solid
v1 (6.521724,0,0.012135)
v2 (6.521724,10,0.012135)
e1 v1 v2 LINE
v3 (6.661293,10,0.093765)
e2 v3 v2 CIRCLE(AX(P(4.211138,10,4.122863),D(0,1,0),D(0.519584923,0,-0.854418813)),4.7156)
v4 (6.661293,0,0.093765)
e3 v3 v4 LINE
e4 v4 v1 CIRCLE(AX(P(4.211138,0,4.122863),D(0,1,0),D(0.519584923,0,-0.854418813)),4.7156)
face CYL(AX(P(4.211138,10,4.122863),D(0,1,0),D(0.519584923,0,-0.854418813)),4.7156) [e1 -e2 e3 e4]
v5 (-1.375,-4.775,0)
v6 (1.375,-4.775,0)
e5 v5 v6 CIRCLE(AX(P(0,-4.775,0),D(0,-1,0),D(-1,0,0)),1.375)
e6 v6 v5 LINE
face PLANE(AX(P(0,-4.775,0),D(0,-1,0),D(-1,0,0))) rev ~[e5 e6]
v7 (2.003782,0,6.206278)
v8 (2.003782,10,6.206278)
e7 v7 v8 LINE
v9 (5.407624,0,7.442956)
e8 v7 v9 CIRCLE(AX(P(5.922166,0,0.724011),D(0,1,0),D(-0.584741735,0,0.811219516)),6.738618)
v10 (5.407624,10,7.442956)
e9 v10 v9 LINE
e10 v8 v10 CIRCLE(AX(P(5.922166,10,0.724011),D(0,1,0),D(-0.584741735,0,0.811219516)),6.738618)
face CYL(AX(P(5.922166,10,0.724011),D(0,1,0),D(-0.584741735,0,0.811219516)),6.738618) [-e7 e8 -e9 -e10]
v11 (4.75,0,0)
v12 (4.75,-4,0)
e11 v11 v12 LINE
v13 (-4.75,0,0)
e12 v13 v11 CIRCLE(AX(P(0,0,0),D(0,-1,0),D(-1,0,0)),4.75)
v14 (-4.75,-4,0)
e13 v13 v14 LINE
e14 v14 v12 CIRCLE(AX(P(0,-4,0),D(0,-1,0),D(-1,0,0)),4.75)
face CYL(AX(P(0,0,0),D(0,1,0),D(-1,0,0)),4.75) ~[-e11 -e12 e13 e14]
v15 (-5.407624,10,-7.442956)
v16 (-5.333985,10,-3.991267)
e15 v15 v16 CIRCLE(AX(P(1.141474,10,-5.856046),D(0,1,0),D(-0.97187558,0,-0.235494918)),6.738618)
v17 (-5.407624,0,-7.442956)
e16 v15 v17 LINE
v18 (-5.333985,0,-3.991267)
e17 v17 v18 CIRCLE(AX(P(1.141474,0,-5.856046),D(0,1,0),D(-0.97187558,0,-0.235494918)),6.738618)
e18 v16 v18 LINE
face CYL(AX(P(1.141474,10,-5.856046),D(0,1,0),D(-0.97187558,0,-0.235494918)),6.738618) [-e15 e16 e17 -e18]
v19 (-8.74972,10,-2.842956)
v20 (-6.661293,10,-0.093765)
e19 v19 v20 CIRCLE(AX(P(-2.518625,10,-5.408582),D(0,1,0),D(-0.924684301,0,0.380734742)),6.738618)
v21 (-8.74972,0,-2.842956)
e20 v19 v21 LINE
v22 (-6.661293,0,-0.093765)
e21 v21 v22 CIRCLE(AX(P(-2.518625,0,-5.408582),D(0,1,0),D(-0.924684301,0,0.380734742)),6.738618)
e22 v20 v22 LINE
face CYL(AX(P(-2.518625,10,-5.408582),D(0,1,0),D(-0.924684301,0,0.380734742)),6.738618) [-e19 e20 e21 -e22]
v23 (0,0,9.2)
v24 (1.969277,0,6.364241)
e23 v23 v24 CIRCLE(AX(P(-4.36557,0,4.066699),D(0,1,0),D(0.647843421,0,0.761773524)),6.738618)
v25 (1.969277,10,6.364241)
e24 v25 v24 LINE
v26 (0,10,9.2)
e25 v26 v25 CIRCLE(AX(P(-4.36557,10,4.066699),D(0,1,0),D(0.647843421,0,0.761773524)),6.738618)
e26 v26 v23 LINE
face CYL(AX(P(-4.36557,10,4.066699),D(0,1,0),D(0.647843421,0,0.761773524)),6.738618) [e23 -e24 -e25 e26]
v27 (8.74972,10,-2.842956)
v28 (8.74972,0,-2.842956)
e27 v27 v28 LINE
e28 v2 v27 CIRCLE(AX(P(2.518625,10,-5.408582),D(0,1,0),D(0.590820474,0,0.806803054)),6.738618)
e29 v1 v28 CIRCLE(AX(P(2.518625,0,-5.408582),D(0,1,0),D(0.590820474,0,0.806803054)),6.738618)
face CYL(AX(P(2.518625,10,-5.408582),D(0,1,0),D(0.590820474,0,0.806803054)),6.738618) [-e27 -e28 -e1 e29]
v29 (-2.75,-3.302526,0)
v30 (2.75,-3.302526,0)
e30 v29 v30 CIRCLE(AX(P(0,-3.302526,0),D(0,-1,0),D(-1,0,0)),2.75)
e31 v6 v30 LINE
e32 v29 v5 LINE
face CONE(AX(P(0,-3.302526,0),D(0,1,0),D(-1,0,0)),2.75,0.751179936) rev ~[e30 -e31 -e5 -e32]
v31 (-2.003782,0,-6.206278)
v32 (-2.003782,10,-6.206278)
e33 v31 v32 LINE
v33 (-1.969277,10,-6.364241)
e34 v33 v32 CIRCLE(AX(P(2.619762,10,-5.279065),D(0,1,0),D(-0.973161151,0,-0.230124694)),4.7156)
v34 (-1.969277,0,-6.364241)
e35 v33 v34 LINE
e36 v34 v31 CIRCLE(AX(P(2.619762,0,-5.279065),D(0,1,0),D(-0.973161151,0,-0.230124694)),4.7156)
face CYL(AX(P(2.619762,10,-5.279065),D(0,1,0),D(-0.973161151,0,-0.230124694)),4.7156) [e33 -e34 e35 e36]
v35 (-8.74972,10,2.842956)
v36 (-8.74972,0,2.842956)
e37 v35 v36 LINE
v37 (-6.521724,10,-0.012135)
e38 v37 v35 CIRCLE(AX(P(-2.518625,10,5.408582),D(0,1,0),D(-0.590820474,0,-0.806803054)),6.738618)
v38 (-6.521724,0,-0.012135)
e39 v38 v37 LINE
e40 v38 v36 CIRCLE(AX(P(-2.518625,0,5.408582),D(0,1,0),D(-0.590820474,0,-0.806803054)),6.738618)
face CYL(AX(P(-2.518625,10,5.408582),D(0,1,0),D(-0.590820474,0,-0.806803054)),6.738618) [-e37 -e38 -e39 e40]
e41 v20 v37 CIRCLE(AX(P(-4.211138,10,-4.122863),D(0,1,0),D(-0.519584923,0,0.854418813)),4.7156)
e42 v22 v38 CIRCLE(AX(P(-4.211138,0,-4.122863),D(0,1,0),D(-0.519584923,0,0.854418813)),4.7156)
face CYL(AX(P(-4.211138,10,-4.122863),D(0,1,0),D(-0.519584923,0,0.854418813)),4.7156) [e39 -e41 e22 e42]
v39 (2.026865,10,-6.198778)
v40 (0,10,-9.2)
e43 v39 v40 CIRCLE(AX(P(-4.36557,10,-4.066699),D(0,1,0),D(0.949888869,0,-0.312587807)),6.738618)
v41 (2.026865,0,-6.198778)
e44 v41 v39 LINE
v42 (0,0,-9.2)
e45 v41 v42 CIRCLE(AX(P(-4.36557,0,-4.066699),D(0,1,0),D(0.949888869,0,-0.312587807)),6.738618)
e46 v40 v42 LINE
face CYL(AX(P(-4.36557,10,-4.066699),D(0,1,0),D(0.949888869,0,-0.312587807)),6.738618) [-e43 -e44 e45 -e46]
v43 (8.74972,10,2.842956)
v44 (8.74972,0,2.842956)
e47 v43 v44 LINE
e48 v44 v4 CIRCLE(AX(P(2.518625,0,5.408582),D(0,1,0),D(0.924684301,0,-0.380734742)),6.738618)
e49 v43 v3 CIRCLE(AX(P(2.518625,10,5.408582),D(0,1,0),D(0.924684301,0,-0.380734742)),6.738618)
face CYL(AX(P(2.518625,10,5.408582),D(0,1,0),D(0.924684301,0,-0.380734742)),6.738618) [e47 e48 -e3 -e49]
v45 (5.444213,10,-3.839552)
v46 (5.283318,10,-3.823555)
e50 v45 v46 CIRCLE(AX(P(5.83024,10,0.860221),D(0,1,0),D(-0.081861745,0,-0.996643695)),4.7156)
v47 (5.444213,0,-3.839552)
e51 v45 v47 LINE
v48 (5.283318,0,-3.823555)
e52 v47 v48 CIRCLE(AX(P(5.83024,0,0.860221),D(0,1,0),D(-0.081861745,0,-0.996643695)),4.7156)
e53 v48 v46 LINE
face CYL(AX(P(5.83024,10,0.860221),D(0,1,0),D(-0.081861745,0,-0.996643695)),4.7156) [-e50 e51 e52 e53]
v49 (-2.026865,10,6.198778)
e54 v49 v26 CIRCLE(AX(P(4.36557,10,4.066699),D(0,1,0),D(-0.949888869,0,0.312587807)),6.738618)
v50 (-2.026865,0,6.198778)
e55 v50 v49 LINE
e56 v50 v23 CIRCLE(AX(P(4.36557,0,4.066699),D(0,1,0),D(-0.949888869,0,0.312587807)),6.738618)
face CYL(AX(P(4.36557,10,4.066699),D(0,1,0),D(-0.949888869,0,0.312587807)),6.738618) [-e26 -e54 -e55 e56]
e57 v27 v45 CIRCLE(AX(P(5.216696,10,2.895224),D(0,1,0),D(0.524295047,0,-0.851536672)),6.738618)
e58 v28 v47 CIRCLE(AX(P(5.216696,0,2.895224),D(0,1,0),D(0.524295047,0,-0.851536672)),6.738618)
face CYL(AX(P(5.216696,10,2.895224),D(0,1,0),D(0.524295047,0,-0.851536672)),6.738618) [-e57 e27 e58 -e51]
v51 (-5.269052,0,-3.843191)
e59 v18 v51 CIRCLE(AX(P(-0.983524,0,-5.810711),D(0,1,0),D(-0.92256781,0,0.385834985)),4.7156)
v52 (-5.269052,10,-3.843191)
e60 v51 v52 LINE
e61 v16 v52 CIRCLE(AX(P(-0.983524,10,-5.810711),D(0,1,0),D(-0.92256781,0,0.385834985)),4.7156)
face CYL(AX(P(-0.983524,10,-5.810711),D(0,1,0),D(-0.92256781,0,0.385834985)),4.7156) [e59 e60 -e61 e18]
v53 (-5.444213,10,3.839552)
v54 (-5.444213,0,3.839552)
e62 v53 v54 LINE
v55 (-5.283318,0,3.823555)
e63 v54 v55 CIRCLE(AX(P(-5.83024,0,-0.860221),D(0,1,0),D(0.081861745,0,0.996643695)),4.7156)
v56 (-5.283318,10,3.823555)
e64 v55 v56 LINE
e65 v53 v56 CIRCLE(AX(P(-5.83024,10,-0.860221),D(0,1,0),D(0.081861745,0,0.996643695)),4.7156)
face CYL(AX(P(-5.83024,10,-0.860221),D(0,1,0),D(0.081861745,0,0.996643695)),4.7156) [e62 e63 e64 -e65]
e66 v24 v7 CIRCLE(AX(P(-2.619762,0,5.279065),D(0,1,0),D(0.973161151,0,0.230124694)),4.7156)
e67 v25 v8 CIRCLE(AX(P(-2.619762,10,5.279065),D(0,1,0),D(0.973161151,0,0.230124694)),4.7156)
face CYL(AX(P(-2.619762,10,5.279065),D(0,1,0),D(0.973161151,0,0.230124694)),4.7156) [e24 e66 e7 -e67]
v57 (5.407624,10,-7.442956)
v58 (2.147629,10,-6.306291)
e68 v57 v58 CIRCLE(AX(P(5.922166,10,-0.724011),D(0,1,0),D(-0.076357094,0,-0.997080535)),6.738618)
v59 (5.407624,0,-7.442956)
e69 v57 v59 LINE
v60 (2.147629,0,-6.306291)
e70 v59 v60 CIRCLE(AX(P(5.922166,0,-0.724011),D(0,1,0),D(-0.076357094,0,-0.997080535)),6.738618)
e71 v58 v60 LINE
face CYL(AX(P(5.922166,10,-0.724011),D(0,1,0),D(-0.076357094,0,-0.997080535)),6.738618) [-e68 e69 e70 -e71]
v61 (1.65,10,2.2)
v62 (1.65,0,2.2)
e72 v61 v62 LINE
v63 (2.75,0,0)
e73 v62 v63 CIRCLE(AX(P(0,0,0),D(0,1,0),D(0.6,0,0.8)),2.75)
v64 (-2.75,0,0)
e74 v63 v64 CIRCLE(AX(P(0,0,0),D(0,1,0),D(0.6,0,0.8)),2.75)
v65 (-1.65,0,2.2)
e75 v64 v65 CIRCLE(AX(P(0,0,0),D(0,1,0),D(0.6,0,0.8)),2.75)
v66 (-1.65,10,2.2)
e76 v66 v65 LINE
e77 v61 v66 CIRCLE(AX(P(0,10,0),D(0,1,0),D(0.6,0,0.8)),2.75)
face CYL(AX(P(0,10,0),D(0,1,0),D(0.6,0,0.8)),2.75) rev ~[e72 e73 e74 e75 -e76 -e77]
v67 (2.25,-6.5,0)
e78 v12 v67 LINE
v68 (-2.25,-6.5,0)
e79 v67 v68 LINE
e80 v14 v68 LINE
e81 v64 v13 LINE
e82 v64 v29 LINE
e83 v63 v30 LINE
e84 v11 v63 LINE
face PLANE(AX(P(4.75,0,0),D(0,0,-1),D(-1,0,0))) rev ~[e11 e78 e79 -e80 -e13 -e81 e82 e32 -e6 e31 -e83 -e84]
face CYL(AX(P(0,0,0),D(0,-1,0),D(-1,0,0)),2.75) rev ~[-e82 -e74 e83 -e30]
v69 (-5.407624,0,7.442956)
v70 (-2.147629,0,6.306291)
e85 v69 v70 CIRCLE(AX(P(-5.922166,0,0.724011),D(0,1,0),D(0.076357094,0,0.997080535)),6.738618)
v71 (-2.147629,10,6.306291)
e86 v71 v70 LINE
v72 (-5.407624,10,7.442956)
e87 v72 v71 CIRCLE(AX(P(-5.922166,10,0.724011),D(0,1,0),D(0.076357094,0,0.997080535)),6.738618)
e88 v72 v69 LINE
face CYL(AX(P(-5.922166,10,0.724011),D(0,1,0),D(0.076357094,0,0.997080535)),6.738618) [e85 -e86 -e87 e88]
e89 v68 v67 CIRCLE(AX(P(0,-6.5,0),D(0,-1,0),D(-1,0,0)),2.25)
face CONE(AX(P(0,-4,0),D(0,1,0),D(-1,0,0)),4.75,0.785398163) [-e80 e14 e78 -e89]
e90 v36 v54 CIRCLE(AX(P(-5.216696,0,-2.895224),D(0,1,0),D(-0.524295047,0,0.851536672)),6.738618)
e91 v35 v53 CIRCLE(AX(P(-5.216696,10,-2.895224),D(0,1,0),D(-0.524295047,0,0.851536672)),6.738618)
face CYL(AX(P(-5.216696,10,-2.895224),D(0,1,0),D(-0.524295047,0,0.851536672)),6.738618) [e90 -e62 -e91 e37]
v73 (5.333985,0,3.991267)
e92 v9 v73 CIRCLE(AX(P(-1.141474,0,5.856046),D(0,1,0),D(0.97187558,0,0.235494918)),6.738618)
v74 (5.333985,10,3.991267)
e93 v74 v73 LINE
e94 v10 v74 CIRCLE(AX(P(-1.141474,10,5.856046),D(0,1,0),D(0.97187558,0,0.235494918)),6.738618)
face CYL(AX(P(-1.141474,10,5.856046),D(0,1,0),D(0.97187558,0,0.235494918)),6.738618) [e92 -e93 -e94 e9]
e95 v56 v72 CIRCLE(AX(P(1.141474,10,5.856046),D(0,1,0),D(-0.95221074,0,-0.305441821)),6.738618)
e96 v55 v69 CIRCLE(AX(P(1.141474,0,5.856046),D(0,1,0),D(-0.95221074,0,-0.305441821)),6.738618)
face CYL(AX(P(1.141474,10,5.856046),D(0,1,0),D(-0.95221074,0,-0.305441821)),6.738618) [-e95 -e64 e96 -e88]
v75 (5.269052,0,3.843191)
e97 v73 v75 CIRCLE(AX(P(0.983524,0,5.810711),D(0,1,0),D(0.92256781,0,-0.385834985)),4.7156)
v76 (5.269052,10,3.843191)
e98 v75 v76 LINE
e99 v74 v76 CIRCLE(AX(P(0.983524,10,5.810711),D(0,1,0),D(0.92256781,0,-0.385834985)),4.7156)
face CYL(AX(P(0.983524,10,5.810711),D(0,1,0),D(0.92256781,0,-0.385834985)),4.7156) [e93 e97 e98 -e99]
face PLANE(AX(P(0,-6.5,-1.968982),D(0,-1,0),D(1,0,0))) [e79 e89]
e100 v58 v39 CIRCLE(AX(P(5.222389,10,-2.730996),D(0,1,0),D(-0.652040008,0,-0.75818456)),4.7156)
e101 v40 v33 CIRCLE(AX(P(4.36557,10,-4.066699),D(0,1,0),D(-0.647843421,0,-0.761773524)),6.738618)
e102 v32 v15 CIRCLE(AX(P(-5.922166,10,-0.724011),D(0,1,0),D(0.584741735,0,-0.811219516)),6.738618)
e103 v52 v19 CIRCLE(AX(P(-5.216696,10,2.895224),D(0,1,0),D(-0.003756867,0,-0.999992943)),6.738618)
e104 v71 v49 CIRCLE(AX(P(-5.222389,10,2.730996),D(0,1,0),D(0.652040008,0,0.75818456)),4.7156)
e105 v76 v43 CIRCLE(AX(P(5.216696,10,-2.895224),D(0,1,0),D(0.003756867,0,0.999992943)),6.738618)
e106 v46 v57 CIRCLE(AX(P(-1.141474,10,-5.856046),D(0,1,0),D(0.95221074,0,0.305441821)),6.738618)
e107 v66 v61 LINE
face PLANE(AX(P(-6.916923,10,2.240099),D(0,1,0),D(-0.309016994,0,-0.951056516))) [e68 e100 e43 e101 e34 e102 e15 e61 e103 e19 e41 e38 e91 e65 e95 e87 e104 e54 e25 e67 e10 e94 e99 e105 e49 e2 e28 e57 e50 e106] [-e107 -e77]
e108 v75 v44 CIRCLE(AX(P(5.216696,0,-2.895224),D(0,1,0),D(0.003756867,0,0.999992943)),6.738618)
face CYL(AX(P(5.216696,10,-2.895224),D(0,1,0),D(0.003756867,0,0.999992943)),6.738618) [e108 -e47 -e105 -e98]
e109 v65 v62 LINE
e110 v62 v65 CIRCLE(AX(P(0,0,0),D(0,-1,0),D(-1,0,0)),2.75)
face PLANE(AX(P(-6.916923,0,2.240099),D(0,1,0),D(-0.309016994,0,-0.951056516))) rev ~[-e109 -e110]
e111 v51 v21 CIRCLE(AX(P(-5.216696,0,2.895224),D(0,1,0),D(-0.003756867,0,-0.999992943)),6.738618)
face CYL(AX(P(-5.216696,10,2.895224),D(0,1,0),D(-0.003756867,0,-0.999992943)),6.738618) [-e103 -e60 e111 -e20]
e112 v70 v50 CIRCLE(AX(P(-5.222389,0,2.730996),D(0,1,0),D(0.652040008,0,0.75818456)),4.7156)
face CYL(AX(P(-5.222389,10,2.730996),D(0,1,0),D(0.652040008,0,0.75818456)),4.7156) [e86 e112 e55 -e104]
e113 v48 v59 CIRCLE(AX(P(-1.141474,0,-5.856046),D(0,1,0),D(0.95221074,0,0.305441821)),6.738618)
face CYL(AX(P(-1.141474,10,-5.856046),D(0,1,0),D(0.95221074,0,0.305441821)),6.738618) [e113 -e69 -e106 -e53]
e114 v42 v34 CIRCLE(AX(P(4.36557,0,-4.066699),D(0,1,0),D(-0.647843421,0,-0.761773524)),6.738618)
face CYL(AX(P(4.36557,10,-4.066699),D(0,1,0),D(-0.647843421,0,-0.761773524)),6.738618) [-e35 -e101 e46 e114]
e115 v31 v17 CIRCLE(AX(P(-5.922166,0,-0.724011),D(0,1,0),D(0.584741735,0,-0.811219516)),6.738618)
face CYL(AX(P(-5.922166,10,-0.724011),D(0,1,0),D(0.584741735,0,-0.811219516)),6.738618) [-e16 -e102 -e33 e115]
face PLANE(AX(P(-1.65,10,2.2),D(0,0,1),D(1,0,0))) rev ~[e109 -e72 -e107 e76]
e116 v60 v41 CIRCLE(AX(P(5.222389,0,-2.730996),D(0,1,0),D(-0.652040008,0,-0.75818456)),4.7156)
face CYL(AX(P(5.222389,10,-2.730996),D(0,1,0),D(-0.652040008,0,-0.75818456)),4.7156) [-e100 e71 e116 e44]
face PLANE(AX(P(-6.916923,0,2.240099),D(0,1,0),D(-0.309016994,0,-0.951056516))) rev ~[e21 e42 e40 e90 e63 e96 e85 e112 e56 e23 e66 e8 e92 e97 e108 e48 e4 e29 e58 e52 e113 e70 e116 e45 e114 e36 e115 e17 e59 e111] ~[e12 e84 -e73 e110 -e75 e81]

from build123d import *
from build123d import SkipClean  # not in build123d's __all__

# Parameters (mm, degrees)
F0_W            = 6.5
F0_H            = 10
F3_DEPTH        = 25
F5_DEPTH        = 10
F5_COPIES_COUNT = 10
F7_DEPTH        = 6.5
F9_SIZE         = 2.5


# Not quite as in the source:
# - a pattern or mirror of a feature is missing from the dataset's text; its kind, count and spacing are read off the source's solid
# - a feature names something its author has since deleted; it is built from what else it names


with BuildPart() as f1:
    # F0 (on Top) → F1 (revolve)
    with BuildSketch(Plane.XY):
        with Locations((-3.25, 5)):
            Rectangle(F0_W, F0_H)
    revolve(axis=Axis((0, 5, 0), (0, 1, 0)))

    # F2 (on face) → F3 (cut)
    with BuildSketch(Plane(origin=(0, 10, 0), x_dir=(-1, 0, 0), z_dir=(0, 1, 0))):
        with BuildLine():
            Line((1.65, 2.2), (-1.65, 2.2))
            ThreePointArc((-1.65, 2.2), (0, -2.75), (1.65, 2.2))
        make_face()
    extrude(amount=-F3_DEPTH, mode=Mode.SUBTRACT)

    # F4 (on face) → F5 (join)
    with BuildSketch(Plane(origin=(0, 10, 0), x_dir=(-1, 0, 0), z_dir=(0, 1, 0))):
        with BuildLine():
            ThreePointArc((-2.0086104634, 6.1818673559), (0.0140777422, 6.4999847551), (2.0353690139, 6.1731088584))
            ThreePointArc((2.0353690139, 6.1731088584), (1.2263837508, 7.8268898276), (0, 9.2))
            ThreePointArc((0, 9.2), (-1.1693294851, 7.9103781541), (-1.9692767773, 6.3642409415))
            ThreePointArc((-1.9692767773, 6.3642409415), (-1.9898456325, 6.2732486915), (-2.0086104634, 6.1818673559))
        make_face()
    f5 = extrude(amount=-F5_DEPTH)

    # F5_copies: F5 ×10 about axis
    f5_copies_axis = Axis((0, 0, 0), (0, 1, 0))
    for i in range(1, F5_COPIES_COUNT):
        add(f5.rotate(f5_copies_axis, i * 360 / F5_COPIES_COUNT), clean=False)

    # F6 (on face) → F7 (join)
    with BuildSketch(Plane.XZ):
        with BuildLine():
            Line((-2.75, 0), (-4.75, 0))
            ThreePointArc((-4.75, 0), (0, -4.75), (4.75, 0))
            Line((4.75, 0), (2.75, 0))
            ThreePointArc((2.75, 0), (0, -2.75), (-2.75, 0))
        make_face()
        with BuildLine():
            Line((2.75, 0), (-2.75, 0))
            ThreePointArc((-2.75, 0), (0, -2.75), (2.75, 0))
        make_face()
    extrude(amount=F7_DEPTH)

    # F9
    f9_edges = [f1.edges().sort_by_distance(p)[0] for p in [
        (0, -6.5, -4.75),
    ]]
    chamfer(f9_edges, length=F9_SIZE)

    # F8 (on face) → F10 (revolve, cut)
    with BuildSketch(Plane.XY):
        Polygon((0, -1.3273195364), (0, 0), (-2.75, 0), (-2.75, -3.3025264561), (-1.375, -4.775), (0, -4.775), (0, -3.3025264561), (0, -1.8300529122), align=None)
    with SkipClean():  # cleaning this boolean's faces spoils the solid; the shape is the same uncleaned
        revolve(axis=Axis((0, -3.3025264561, 0), (0, -1, 0)), mode=Mode.SUBTRACT)


solid = f1.part
